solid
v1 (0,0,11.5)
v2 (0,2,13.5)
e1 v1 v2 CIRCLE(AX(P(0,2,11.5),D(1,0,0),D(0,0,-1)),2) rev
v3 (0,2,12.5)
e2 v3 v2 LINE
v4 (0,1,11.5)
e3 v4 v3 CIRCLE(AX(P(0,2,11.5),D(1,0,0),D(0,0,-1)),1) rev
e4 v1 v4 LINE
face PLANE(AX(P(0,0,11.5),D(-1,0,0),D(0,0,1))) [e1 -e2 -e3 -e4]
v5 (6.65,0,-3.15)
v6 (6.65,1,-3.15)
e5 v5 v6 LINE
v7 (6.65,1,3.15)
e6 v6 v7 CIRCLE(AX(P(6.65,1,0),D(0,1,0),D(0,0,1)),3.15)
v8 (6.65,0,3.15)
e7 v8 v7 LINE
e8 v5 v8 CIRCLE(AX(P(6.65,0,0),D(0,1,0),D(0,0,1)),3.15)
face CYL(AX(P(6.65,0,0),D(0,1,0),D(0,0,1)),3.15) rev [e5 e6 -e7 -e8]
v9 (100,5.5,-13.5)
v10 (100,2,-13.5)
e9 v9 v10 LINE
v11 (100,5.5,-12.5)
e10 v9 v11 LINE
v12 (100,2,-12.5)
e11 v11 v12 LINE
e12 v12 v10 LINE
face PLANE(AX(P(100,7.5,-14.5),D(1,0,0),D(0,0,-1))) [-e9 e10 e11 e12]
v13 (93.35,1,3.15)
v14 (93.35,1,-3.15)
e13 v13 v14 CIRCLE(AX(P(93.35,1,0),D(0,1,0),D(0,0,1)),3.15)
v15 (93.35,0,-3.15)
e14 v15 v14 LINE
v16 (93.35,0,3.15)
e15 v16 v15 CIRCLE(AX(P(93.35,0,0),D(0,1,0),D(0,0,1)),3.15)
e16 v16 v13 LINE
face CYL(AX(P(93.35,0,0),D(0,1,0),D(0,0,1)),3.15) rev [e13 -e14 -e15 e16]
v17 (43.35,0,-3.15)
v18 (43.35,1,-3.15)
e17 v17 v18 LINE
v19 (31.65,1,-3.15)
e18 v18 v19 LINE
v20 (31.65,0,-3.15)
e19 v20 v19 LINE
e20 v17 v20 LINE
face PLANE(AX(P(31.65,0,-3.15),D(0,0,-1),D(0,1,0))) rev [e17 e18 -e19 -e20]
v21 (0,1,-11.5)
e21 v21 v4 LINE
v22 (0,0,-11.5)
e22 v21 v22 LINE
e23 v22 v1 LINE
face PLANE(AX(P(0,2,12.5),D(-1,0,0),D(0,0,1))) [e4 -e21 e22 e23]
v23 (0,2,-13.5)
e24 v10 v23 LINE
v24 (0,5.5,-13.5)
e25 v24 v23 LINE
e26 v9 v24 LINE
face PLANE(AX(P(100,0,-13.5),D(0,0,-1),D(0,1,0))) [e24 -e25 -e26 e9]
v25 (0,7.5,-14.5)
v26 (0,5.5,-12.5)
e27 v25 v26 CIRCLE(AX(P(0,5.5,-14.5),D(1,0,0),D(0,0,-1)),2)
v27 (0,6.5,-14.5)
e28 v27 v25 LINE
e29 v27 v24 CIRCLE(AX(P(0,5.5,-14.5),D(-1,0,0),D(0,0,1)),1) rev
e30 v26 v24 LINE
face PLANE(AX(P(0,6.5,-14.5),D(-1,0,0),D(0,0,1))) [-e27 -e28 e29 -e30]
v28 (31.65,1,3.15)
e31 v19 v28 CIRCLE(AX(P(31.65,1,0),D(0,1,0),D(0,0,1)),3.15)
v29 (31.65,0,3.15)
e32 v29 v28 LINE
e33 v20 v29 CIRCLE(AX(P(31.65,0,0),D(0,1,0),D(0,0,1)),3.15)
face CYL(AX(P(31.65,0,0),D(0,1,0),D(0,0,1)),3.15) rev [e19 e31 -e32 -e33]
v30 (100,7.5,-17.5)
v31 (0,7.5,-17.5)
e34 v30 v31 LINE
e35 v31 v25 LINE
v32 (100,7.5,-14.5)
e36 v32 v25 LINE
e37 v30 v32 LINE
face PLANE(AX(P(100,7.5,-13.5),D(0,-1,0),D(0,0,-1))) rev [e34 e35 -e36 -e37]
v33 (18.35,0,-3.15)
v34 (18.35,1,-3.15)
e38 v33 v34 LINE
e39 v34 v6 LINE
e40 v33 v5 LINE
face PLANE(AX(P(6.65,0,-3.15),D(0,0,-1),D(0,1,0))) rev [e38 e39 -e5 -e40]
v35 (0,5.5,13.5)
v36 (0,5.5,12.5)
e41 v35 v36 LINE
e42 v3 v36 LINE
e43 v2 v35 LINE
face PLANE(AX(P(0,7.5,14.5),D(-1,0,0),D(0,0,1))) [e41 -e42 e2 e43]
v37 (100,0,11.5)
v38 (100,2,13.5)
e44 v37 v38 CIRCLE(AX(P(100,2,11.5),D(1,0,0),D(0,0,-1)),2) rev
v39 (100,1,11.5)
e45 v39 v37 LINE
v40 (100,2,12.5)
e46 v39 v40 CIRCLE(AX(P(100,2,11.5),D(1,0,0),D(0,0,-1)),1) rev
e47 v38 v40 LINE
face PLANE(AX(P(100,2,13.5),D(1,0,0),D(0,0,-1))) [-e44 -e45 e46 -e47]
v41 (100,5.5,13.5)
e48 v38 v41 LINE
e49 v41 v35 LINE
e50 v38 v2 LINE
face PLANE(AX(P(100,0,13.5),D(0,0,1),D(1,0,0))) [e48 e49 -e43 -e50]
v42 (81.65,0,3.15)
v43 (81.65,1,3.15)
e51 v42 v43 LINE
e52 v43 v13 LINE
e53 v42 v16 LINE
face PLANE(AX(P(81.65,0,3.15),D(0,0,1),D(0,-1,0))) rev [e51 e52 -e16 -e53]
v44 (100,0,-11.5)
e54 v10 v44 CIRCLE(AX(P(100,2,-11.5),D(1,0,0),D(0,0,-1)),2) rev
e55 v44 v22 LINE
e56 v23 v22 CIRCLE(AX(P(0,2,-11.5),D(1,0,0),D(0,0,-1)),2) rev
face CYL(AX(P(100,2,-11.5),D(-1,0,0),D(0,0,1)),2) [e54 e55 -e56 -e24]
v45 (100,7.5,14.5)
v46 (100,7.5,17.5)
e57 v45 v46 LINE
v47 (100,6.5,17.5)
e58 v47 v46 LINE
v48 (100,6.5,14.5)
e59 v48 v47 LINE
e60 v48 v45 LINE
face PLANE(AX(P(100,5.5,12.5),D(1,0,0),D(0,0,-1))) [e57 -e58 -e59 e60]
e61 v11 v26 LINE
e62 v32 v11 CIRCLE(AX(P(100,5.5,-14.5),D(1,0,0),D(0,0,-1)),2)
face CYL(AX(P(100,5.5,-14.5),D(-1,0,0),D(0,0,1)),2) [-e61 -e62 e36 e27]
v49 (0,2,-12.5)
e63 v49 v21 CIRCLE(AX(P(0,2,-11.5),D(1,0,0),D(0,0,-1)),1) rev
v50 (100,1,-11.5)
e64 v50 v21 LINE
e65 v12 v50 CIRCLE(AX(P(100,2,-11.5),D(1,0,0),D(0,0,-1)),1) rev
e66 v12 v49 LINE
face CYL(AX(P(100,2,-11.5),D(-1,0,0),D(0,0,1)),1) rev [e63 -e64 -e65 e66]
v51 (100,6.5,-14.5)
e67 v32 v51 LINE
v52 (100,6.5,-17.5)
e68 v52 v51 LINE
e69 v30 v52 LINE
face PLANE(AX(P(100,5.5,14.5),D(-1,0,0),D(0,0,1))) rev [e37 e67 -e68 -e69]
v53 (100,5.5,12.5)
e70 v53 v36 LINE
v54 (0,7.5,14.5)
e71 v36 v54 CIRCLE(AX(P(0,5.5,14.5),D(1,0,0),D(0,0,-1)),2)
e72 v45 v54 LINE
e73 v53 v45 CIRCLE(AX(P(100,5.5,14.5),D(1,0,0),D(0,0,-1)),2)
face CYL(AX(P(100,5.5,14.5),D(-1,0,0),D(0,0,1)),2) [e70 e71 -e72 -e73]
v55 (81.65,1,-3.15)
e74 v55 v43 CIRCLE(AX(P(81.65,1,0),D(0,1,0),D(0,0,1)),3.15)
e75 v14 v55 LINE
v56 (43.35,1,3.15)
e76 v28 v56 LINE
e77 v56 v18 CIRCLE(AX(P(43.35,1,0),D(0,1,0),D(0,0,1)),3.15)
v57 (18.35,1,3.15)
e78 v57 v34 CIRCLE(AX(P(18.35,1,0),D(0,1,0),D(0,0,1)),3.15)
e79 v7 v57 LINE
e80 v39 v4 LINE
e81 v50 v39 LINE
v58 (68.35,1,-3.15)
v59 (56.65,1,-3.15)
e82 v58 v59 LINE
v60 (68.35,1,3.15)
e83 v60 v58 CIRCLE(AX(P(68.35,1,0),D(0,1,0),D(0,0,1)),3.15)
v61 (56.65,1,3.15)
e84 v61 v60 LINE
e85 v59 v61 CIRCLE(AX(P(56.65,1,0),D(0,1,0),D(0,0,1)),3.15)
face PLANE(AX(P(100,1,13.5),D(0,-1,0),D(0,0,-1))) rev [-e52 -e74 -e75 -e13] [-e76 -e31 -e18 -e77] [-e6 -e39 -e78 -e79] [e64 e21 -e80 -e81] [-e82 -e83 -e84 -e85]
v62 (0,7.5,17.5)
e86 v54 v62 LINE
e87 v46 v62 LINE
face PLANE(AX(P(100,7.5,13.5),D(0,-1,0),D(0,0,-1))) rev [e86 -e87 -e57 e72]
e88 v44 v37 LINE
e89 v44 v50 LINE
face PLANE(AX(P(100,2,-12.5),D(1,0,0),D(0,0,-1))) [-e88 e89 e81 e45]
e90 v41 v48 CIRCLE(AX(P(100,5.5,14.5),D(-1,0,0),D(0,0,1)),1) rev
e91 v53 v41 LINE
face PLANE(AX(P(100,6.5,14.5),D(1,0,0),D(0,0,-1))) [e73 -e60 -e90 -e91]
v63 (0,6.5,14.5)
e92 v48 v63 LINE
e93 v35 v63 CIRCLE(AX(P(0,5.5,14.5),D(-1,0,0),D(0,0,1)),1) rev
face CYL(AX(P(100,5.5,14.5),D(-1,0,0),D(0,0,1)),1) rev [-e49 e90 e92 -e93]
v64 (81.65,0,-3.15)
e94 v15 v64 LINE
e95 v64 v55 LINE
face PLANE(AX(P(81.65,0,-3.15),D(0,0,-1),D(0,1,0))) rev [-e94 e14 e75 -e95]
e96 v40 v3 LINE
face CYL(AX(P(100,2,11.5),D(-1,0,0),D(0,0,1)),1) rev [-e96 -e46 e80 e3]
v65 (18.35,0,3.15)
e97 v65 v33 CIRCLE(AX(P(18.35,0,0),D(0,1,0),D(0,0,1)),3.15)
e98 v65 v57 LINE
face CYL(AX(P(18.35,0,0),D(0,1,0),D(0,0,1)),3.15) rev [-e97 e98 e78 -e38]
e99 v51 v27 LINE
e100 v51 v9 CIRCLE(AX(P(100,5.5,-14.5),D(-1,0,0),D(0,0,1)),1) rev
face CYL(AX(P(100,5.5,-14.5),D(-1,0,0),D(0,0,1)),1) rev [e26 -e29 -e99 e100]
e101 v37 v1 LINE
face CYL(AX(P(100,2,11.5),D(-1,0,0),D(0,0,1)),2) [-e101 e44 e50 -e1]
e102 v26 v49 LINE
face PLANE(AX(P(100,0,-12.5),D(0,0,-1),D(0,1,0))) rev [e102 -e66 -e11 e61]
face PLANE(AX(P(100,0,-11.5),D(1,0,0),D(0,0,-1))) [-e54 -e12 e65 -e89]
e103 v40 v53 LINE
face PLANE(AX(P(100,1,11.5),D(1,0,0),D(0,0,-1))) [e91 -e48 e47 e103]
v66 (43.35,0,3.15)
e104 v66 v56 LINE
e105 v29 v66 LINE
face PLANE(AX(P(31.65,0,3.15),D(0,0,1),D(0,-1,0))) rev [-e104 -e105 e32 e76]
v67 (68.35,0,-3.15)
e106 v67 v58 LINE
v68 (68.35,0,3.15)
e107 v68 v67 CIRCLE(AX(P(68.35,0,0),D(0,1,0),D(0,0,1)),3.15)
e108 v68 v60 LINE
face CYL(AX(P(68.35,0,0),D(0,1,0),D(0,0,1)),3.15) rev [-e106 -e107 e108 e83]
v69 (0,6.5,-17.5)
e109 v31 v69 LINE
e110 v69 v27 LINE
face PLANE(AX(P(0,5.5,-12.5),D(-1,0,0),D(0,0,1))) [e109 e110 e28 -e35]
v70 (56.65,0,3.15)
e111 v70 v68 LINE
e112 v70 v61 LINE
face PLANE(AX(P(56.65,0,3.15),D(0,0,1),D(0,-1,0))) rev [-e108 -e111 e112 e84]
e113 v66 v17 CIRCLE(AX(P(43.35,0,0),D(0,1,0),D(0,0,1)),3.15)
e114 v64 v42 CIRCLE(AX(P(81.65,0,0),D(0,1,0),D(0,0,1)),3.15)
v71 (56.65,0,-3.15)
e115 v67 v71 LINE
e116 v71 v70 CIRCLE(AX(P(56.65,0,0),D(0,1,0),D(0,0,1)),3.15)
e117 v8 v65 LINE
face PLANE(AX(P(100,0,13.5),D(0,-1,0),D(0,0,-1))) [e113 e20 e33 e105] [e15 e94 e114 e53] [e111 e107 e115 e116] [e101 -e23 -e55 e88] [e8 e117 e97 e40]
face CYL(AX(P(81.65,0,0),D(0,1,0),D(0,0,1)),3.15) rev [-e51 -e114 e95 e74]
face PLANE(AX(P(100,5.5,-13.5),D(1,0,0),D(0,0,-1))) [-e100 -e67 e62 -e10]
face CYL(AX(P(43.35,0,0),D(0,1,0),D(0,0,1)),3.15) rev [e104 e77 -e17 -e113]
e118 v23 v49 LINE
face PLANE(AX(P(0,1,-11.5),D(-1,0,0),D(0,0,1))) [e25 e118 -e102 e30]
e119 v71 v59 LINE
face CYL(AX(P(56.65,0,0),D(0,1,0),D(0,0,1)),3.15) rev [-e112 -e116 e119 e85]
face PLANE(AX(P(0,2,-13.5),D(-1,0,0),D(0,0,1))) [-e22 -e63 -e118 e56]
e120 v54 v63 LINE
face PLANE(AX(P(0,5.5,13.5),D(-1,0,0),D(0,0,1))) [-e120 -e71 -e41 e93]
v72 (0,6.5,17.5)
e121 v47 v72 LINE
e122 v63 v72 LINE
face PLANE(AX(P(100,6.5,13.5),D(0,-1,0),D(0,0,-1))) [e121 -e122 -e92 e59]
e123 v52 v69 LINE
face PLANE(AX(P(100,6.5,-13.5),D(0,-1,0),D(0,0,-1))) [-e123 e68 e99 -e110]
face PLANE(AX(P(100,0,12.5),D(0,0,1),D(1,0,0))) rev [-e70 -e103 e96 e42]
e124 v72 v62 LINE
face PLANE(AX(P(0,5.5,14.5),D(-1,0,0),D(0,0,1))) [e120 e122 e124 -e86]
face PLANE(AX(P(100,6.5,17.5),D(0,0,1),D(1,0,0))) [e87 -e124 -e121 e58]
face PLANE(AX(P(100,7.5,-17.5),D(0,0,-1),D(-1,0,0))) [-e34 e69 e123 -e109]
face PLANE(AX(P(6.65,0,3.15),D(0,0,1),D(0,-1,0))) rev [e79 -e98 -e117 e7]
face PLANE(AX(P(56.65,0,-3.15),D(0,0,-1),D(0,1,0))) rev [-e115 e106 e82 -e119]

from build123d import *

# Parameters (mm, degrees)
SM_BASE_FLANGE_1_DEPTH = 100
CUT_EXTRUDE_1_DEPTH    = 102.727577382
PATTERN_LINEAR_6_COUNT = 4
PATTERN_LINEAR_6_PITCH = 25


# Sheet-metal steps are written as plain solids
with BuildPart() as part:
    # Sketch 1 → Базовая кромка1 (new body)
    with BuildSketch(Plane(origin=(0, 0, 0), x_dir=(0, 0, -1), z_dir=(1, 0, 0))):
        with BuildLine():
            Line((-17.5, 6.5), (-14.5, 6.5))
            ThreePointArc((-14.5, 6.5), (-13.792893219, 6.207106781), (-13.5, 5.5))
            Line((-13.5, 5.5), (-13.5, 2))
            ThreePointArc((-13.5, 2), (-12.914213562, 0.585786438), (-11.5, 0))
            Line((-11.5, 0), (11.5, 0))
            ThreePointArc((11.5, 0), (12.914213562, 0.585786438), (13.5, 2))
            Line((13.5, 2), (13.5, 5.5))
            ThreePointArc((13.5, 5.5), (13.792893219, 6.207106781), (14.5, 6.5))
            Line((14.5, 6.5), (17.5, 6.5))
            Line((17.5, 6.5), (17.5, 7.5))
            Line((17.5, 7.5), (14.5, 7.5))
            ThreePointArc((14.5, 7.5), (13.085786438, 6.914213562), (12.5, 5.5))
            Line((12.5, 5.5), (12.5, 2))
            ThreePointArc((12.5, 2), (12.207106781, 1.292893219), (11.5, 1))
            Line((11.5, 1), (-11.5, 1))
            ThreePointArc((-11.5, 1), (-12.207106781, 1.292893219), (-12.5, 2))
            Line((-12.5, 2), (-12.5, 5.5))
            ThreePointArc((-12.5, 5.5), (-13.085786438, 6.914213562), (-14.5, 7.5))
            Line((-14.5, 7.5), (-17.5, 7.5))
            Line((-17.5, 7.5), (-17.5, 6.5))
        make_face()
    extrude(amount=SM_BASE_FLANGE_1_DEPTH)

    # Эскиз6 → Вырез-Вытянуть1 (cut, through all)
    with BuildSketch(Plane(origin=(0, 1, 0), x_dir=(1, 0, 0), z_dir=(0, 1, 0))):
        with BuildLine():
            Line((6.65, 3.15), (18.35, 3.15))
            ThreePointArc((18.35, 3.15), (21.5, 0), (18.35, -3.15))
            Line((18.35, -3.15), (6.65, -3.15))
            ThreePointArc((6.65, -3.15), (3.5, 0), (6.65, 3.15))
        make_face()
    cut_extrude_1 = extrude(amount=-CUT_EXTRUDE_1_DEPTH, mode=Mode.SUBTRACT)

    # Линейный массив6: Вырез-Вытянуть1 ×4
    with Locations(*[(i * PATTERN_LINEAR_6_PITCH, 0, 0) for i in range(1, PATTERN_LINEAR_6_COUNT)]):
        add(cut_extrude_1, mode=Mode.SUBTRACT)


solid = part.part
